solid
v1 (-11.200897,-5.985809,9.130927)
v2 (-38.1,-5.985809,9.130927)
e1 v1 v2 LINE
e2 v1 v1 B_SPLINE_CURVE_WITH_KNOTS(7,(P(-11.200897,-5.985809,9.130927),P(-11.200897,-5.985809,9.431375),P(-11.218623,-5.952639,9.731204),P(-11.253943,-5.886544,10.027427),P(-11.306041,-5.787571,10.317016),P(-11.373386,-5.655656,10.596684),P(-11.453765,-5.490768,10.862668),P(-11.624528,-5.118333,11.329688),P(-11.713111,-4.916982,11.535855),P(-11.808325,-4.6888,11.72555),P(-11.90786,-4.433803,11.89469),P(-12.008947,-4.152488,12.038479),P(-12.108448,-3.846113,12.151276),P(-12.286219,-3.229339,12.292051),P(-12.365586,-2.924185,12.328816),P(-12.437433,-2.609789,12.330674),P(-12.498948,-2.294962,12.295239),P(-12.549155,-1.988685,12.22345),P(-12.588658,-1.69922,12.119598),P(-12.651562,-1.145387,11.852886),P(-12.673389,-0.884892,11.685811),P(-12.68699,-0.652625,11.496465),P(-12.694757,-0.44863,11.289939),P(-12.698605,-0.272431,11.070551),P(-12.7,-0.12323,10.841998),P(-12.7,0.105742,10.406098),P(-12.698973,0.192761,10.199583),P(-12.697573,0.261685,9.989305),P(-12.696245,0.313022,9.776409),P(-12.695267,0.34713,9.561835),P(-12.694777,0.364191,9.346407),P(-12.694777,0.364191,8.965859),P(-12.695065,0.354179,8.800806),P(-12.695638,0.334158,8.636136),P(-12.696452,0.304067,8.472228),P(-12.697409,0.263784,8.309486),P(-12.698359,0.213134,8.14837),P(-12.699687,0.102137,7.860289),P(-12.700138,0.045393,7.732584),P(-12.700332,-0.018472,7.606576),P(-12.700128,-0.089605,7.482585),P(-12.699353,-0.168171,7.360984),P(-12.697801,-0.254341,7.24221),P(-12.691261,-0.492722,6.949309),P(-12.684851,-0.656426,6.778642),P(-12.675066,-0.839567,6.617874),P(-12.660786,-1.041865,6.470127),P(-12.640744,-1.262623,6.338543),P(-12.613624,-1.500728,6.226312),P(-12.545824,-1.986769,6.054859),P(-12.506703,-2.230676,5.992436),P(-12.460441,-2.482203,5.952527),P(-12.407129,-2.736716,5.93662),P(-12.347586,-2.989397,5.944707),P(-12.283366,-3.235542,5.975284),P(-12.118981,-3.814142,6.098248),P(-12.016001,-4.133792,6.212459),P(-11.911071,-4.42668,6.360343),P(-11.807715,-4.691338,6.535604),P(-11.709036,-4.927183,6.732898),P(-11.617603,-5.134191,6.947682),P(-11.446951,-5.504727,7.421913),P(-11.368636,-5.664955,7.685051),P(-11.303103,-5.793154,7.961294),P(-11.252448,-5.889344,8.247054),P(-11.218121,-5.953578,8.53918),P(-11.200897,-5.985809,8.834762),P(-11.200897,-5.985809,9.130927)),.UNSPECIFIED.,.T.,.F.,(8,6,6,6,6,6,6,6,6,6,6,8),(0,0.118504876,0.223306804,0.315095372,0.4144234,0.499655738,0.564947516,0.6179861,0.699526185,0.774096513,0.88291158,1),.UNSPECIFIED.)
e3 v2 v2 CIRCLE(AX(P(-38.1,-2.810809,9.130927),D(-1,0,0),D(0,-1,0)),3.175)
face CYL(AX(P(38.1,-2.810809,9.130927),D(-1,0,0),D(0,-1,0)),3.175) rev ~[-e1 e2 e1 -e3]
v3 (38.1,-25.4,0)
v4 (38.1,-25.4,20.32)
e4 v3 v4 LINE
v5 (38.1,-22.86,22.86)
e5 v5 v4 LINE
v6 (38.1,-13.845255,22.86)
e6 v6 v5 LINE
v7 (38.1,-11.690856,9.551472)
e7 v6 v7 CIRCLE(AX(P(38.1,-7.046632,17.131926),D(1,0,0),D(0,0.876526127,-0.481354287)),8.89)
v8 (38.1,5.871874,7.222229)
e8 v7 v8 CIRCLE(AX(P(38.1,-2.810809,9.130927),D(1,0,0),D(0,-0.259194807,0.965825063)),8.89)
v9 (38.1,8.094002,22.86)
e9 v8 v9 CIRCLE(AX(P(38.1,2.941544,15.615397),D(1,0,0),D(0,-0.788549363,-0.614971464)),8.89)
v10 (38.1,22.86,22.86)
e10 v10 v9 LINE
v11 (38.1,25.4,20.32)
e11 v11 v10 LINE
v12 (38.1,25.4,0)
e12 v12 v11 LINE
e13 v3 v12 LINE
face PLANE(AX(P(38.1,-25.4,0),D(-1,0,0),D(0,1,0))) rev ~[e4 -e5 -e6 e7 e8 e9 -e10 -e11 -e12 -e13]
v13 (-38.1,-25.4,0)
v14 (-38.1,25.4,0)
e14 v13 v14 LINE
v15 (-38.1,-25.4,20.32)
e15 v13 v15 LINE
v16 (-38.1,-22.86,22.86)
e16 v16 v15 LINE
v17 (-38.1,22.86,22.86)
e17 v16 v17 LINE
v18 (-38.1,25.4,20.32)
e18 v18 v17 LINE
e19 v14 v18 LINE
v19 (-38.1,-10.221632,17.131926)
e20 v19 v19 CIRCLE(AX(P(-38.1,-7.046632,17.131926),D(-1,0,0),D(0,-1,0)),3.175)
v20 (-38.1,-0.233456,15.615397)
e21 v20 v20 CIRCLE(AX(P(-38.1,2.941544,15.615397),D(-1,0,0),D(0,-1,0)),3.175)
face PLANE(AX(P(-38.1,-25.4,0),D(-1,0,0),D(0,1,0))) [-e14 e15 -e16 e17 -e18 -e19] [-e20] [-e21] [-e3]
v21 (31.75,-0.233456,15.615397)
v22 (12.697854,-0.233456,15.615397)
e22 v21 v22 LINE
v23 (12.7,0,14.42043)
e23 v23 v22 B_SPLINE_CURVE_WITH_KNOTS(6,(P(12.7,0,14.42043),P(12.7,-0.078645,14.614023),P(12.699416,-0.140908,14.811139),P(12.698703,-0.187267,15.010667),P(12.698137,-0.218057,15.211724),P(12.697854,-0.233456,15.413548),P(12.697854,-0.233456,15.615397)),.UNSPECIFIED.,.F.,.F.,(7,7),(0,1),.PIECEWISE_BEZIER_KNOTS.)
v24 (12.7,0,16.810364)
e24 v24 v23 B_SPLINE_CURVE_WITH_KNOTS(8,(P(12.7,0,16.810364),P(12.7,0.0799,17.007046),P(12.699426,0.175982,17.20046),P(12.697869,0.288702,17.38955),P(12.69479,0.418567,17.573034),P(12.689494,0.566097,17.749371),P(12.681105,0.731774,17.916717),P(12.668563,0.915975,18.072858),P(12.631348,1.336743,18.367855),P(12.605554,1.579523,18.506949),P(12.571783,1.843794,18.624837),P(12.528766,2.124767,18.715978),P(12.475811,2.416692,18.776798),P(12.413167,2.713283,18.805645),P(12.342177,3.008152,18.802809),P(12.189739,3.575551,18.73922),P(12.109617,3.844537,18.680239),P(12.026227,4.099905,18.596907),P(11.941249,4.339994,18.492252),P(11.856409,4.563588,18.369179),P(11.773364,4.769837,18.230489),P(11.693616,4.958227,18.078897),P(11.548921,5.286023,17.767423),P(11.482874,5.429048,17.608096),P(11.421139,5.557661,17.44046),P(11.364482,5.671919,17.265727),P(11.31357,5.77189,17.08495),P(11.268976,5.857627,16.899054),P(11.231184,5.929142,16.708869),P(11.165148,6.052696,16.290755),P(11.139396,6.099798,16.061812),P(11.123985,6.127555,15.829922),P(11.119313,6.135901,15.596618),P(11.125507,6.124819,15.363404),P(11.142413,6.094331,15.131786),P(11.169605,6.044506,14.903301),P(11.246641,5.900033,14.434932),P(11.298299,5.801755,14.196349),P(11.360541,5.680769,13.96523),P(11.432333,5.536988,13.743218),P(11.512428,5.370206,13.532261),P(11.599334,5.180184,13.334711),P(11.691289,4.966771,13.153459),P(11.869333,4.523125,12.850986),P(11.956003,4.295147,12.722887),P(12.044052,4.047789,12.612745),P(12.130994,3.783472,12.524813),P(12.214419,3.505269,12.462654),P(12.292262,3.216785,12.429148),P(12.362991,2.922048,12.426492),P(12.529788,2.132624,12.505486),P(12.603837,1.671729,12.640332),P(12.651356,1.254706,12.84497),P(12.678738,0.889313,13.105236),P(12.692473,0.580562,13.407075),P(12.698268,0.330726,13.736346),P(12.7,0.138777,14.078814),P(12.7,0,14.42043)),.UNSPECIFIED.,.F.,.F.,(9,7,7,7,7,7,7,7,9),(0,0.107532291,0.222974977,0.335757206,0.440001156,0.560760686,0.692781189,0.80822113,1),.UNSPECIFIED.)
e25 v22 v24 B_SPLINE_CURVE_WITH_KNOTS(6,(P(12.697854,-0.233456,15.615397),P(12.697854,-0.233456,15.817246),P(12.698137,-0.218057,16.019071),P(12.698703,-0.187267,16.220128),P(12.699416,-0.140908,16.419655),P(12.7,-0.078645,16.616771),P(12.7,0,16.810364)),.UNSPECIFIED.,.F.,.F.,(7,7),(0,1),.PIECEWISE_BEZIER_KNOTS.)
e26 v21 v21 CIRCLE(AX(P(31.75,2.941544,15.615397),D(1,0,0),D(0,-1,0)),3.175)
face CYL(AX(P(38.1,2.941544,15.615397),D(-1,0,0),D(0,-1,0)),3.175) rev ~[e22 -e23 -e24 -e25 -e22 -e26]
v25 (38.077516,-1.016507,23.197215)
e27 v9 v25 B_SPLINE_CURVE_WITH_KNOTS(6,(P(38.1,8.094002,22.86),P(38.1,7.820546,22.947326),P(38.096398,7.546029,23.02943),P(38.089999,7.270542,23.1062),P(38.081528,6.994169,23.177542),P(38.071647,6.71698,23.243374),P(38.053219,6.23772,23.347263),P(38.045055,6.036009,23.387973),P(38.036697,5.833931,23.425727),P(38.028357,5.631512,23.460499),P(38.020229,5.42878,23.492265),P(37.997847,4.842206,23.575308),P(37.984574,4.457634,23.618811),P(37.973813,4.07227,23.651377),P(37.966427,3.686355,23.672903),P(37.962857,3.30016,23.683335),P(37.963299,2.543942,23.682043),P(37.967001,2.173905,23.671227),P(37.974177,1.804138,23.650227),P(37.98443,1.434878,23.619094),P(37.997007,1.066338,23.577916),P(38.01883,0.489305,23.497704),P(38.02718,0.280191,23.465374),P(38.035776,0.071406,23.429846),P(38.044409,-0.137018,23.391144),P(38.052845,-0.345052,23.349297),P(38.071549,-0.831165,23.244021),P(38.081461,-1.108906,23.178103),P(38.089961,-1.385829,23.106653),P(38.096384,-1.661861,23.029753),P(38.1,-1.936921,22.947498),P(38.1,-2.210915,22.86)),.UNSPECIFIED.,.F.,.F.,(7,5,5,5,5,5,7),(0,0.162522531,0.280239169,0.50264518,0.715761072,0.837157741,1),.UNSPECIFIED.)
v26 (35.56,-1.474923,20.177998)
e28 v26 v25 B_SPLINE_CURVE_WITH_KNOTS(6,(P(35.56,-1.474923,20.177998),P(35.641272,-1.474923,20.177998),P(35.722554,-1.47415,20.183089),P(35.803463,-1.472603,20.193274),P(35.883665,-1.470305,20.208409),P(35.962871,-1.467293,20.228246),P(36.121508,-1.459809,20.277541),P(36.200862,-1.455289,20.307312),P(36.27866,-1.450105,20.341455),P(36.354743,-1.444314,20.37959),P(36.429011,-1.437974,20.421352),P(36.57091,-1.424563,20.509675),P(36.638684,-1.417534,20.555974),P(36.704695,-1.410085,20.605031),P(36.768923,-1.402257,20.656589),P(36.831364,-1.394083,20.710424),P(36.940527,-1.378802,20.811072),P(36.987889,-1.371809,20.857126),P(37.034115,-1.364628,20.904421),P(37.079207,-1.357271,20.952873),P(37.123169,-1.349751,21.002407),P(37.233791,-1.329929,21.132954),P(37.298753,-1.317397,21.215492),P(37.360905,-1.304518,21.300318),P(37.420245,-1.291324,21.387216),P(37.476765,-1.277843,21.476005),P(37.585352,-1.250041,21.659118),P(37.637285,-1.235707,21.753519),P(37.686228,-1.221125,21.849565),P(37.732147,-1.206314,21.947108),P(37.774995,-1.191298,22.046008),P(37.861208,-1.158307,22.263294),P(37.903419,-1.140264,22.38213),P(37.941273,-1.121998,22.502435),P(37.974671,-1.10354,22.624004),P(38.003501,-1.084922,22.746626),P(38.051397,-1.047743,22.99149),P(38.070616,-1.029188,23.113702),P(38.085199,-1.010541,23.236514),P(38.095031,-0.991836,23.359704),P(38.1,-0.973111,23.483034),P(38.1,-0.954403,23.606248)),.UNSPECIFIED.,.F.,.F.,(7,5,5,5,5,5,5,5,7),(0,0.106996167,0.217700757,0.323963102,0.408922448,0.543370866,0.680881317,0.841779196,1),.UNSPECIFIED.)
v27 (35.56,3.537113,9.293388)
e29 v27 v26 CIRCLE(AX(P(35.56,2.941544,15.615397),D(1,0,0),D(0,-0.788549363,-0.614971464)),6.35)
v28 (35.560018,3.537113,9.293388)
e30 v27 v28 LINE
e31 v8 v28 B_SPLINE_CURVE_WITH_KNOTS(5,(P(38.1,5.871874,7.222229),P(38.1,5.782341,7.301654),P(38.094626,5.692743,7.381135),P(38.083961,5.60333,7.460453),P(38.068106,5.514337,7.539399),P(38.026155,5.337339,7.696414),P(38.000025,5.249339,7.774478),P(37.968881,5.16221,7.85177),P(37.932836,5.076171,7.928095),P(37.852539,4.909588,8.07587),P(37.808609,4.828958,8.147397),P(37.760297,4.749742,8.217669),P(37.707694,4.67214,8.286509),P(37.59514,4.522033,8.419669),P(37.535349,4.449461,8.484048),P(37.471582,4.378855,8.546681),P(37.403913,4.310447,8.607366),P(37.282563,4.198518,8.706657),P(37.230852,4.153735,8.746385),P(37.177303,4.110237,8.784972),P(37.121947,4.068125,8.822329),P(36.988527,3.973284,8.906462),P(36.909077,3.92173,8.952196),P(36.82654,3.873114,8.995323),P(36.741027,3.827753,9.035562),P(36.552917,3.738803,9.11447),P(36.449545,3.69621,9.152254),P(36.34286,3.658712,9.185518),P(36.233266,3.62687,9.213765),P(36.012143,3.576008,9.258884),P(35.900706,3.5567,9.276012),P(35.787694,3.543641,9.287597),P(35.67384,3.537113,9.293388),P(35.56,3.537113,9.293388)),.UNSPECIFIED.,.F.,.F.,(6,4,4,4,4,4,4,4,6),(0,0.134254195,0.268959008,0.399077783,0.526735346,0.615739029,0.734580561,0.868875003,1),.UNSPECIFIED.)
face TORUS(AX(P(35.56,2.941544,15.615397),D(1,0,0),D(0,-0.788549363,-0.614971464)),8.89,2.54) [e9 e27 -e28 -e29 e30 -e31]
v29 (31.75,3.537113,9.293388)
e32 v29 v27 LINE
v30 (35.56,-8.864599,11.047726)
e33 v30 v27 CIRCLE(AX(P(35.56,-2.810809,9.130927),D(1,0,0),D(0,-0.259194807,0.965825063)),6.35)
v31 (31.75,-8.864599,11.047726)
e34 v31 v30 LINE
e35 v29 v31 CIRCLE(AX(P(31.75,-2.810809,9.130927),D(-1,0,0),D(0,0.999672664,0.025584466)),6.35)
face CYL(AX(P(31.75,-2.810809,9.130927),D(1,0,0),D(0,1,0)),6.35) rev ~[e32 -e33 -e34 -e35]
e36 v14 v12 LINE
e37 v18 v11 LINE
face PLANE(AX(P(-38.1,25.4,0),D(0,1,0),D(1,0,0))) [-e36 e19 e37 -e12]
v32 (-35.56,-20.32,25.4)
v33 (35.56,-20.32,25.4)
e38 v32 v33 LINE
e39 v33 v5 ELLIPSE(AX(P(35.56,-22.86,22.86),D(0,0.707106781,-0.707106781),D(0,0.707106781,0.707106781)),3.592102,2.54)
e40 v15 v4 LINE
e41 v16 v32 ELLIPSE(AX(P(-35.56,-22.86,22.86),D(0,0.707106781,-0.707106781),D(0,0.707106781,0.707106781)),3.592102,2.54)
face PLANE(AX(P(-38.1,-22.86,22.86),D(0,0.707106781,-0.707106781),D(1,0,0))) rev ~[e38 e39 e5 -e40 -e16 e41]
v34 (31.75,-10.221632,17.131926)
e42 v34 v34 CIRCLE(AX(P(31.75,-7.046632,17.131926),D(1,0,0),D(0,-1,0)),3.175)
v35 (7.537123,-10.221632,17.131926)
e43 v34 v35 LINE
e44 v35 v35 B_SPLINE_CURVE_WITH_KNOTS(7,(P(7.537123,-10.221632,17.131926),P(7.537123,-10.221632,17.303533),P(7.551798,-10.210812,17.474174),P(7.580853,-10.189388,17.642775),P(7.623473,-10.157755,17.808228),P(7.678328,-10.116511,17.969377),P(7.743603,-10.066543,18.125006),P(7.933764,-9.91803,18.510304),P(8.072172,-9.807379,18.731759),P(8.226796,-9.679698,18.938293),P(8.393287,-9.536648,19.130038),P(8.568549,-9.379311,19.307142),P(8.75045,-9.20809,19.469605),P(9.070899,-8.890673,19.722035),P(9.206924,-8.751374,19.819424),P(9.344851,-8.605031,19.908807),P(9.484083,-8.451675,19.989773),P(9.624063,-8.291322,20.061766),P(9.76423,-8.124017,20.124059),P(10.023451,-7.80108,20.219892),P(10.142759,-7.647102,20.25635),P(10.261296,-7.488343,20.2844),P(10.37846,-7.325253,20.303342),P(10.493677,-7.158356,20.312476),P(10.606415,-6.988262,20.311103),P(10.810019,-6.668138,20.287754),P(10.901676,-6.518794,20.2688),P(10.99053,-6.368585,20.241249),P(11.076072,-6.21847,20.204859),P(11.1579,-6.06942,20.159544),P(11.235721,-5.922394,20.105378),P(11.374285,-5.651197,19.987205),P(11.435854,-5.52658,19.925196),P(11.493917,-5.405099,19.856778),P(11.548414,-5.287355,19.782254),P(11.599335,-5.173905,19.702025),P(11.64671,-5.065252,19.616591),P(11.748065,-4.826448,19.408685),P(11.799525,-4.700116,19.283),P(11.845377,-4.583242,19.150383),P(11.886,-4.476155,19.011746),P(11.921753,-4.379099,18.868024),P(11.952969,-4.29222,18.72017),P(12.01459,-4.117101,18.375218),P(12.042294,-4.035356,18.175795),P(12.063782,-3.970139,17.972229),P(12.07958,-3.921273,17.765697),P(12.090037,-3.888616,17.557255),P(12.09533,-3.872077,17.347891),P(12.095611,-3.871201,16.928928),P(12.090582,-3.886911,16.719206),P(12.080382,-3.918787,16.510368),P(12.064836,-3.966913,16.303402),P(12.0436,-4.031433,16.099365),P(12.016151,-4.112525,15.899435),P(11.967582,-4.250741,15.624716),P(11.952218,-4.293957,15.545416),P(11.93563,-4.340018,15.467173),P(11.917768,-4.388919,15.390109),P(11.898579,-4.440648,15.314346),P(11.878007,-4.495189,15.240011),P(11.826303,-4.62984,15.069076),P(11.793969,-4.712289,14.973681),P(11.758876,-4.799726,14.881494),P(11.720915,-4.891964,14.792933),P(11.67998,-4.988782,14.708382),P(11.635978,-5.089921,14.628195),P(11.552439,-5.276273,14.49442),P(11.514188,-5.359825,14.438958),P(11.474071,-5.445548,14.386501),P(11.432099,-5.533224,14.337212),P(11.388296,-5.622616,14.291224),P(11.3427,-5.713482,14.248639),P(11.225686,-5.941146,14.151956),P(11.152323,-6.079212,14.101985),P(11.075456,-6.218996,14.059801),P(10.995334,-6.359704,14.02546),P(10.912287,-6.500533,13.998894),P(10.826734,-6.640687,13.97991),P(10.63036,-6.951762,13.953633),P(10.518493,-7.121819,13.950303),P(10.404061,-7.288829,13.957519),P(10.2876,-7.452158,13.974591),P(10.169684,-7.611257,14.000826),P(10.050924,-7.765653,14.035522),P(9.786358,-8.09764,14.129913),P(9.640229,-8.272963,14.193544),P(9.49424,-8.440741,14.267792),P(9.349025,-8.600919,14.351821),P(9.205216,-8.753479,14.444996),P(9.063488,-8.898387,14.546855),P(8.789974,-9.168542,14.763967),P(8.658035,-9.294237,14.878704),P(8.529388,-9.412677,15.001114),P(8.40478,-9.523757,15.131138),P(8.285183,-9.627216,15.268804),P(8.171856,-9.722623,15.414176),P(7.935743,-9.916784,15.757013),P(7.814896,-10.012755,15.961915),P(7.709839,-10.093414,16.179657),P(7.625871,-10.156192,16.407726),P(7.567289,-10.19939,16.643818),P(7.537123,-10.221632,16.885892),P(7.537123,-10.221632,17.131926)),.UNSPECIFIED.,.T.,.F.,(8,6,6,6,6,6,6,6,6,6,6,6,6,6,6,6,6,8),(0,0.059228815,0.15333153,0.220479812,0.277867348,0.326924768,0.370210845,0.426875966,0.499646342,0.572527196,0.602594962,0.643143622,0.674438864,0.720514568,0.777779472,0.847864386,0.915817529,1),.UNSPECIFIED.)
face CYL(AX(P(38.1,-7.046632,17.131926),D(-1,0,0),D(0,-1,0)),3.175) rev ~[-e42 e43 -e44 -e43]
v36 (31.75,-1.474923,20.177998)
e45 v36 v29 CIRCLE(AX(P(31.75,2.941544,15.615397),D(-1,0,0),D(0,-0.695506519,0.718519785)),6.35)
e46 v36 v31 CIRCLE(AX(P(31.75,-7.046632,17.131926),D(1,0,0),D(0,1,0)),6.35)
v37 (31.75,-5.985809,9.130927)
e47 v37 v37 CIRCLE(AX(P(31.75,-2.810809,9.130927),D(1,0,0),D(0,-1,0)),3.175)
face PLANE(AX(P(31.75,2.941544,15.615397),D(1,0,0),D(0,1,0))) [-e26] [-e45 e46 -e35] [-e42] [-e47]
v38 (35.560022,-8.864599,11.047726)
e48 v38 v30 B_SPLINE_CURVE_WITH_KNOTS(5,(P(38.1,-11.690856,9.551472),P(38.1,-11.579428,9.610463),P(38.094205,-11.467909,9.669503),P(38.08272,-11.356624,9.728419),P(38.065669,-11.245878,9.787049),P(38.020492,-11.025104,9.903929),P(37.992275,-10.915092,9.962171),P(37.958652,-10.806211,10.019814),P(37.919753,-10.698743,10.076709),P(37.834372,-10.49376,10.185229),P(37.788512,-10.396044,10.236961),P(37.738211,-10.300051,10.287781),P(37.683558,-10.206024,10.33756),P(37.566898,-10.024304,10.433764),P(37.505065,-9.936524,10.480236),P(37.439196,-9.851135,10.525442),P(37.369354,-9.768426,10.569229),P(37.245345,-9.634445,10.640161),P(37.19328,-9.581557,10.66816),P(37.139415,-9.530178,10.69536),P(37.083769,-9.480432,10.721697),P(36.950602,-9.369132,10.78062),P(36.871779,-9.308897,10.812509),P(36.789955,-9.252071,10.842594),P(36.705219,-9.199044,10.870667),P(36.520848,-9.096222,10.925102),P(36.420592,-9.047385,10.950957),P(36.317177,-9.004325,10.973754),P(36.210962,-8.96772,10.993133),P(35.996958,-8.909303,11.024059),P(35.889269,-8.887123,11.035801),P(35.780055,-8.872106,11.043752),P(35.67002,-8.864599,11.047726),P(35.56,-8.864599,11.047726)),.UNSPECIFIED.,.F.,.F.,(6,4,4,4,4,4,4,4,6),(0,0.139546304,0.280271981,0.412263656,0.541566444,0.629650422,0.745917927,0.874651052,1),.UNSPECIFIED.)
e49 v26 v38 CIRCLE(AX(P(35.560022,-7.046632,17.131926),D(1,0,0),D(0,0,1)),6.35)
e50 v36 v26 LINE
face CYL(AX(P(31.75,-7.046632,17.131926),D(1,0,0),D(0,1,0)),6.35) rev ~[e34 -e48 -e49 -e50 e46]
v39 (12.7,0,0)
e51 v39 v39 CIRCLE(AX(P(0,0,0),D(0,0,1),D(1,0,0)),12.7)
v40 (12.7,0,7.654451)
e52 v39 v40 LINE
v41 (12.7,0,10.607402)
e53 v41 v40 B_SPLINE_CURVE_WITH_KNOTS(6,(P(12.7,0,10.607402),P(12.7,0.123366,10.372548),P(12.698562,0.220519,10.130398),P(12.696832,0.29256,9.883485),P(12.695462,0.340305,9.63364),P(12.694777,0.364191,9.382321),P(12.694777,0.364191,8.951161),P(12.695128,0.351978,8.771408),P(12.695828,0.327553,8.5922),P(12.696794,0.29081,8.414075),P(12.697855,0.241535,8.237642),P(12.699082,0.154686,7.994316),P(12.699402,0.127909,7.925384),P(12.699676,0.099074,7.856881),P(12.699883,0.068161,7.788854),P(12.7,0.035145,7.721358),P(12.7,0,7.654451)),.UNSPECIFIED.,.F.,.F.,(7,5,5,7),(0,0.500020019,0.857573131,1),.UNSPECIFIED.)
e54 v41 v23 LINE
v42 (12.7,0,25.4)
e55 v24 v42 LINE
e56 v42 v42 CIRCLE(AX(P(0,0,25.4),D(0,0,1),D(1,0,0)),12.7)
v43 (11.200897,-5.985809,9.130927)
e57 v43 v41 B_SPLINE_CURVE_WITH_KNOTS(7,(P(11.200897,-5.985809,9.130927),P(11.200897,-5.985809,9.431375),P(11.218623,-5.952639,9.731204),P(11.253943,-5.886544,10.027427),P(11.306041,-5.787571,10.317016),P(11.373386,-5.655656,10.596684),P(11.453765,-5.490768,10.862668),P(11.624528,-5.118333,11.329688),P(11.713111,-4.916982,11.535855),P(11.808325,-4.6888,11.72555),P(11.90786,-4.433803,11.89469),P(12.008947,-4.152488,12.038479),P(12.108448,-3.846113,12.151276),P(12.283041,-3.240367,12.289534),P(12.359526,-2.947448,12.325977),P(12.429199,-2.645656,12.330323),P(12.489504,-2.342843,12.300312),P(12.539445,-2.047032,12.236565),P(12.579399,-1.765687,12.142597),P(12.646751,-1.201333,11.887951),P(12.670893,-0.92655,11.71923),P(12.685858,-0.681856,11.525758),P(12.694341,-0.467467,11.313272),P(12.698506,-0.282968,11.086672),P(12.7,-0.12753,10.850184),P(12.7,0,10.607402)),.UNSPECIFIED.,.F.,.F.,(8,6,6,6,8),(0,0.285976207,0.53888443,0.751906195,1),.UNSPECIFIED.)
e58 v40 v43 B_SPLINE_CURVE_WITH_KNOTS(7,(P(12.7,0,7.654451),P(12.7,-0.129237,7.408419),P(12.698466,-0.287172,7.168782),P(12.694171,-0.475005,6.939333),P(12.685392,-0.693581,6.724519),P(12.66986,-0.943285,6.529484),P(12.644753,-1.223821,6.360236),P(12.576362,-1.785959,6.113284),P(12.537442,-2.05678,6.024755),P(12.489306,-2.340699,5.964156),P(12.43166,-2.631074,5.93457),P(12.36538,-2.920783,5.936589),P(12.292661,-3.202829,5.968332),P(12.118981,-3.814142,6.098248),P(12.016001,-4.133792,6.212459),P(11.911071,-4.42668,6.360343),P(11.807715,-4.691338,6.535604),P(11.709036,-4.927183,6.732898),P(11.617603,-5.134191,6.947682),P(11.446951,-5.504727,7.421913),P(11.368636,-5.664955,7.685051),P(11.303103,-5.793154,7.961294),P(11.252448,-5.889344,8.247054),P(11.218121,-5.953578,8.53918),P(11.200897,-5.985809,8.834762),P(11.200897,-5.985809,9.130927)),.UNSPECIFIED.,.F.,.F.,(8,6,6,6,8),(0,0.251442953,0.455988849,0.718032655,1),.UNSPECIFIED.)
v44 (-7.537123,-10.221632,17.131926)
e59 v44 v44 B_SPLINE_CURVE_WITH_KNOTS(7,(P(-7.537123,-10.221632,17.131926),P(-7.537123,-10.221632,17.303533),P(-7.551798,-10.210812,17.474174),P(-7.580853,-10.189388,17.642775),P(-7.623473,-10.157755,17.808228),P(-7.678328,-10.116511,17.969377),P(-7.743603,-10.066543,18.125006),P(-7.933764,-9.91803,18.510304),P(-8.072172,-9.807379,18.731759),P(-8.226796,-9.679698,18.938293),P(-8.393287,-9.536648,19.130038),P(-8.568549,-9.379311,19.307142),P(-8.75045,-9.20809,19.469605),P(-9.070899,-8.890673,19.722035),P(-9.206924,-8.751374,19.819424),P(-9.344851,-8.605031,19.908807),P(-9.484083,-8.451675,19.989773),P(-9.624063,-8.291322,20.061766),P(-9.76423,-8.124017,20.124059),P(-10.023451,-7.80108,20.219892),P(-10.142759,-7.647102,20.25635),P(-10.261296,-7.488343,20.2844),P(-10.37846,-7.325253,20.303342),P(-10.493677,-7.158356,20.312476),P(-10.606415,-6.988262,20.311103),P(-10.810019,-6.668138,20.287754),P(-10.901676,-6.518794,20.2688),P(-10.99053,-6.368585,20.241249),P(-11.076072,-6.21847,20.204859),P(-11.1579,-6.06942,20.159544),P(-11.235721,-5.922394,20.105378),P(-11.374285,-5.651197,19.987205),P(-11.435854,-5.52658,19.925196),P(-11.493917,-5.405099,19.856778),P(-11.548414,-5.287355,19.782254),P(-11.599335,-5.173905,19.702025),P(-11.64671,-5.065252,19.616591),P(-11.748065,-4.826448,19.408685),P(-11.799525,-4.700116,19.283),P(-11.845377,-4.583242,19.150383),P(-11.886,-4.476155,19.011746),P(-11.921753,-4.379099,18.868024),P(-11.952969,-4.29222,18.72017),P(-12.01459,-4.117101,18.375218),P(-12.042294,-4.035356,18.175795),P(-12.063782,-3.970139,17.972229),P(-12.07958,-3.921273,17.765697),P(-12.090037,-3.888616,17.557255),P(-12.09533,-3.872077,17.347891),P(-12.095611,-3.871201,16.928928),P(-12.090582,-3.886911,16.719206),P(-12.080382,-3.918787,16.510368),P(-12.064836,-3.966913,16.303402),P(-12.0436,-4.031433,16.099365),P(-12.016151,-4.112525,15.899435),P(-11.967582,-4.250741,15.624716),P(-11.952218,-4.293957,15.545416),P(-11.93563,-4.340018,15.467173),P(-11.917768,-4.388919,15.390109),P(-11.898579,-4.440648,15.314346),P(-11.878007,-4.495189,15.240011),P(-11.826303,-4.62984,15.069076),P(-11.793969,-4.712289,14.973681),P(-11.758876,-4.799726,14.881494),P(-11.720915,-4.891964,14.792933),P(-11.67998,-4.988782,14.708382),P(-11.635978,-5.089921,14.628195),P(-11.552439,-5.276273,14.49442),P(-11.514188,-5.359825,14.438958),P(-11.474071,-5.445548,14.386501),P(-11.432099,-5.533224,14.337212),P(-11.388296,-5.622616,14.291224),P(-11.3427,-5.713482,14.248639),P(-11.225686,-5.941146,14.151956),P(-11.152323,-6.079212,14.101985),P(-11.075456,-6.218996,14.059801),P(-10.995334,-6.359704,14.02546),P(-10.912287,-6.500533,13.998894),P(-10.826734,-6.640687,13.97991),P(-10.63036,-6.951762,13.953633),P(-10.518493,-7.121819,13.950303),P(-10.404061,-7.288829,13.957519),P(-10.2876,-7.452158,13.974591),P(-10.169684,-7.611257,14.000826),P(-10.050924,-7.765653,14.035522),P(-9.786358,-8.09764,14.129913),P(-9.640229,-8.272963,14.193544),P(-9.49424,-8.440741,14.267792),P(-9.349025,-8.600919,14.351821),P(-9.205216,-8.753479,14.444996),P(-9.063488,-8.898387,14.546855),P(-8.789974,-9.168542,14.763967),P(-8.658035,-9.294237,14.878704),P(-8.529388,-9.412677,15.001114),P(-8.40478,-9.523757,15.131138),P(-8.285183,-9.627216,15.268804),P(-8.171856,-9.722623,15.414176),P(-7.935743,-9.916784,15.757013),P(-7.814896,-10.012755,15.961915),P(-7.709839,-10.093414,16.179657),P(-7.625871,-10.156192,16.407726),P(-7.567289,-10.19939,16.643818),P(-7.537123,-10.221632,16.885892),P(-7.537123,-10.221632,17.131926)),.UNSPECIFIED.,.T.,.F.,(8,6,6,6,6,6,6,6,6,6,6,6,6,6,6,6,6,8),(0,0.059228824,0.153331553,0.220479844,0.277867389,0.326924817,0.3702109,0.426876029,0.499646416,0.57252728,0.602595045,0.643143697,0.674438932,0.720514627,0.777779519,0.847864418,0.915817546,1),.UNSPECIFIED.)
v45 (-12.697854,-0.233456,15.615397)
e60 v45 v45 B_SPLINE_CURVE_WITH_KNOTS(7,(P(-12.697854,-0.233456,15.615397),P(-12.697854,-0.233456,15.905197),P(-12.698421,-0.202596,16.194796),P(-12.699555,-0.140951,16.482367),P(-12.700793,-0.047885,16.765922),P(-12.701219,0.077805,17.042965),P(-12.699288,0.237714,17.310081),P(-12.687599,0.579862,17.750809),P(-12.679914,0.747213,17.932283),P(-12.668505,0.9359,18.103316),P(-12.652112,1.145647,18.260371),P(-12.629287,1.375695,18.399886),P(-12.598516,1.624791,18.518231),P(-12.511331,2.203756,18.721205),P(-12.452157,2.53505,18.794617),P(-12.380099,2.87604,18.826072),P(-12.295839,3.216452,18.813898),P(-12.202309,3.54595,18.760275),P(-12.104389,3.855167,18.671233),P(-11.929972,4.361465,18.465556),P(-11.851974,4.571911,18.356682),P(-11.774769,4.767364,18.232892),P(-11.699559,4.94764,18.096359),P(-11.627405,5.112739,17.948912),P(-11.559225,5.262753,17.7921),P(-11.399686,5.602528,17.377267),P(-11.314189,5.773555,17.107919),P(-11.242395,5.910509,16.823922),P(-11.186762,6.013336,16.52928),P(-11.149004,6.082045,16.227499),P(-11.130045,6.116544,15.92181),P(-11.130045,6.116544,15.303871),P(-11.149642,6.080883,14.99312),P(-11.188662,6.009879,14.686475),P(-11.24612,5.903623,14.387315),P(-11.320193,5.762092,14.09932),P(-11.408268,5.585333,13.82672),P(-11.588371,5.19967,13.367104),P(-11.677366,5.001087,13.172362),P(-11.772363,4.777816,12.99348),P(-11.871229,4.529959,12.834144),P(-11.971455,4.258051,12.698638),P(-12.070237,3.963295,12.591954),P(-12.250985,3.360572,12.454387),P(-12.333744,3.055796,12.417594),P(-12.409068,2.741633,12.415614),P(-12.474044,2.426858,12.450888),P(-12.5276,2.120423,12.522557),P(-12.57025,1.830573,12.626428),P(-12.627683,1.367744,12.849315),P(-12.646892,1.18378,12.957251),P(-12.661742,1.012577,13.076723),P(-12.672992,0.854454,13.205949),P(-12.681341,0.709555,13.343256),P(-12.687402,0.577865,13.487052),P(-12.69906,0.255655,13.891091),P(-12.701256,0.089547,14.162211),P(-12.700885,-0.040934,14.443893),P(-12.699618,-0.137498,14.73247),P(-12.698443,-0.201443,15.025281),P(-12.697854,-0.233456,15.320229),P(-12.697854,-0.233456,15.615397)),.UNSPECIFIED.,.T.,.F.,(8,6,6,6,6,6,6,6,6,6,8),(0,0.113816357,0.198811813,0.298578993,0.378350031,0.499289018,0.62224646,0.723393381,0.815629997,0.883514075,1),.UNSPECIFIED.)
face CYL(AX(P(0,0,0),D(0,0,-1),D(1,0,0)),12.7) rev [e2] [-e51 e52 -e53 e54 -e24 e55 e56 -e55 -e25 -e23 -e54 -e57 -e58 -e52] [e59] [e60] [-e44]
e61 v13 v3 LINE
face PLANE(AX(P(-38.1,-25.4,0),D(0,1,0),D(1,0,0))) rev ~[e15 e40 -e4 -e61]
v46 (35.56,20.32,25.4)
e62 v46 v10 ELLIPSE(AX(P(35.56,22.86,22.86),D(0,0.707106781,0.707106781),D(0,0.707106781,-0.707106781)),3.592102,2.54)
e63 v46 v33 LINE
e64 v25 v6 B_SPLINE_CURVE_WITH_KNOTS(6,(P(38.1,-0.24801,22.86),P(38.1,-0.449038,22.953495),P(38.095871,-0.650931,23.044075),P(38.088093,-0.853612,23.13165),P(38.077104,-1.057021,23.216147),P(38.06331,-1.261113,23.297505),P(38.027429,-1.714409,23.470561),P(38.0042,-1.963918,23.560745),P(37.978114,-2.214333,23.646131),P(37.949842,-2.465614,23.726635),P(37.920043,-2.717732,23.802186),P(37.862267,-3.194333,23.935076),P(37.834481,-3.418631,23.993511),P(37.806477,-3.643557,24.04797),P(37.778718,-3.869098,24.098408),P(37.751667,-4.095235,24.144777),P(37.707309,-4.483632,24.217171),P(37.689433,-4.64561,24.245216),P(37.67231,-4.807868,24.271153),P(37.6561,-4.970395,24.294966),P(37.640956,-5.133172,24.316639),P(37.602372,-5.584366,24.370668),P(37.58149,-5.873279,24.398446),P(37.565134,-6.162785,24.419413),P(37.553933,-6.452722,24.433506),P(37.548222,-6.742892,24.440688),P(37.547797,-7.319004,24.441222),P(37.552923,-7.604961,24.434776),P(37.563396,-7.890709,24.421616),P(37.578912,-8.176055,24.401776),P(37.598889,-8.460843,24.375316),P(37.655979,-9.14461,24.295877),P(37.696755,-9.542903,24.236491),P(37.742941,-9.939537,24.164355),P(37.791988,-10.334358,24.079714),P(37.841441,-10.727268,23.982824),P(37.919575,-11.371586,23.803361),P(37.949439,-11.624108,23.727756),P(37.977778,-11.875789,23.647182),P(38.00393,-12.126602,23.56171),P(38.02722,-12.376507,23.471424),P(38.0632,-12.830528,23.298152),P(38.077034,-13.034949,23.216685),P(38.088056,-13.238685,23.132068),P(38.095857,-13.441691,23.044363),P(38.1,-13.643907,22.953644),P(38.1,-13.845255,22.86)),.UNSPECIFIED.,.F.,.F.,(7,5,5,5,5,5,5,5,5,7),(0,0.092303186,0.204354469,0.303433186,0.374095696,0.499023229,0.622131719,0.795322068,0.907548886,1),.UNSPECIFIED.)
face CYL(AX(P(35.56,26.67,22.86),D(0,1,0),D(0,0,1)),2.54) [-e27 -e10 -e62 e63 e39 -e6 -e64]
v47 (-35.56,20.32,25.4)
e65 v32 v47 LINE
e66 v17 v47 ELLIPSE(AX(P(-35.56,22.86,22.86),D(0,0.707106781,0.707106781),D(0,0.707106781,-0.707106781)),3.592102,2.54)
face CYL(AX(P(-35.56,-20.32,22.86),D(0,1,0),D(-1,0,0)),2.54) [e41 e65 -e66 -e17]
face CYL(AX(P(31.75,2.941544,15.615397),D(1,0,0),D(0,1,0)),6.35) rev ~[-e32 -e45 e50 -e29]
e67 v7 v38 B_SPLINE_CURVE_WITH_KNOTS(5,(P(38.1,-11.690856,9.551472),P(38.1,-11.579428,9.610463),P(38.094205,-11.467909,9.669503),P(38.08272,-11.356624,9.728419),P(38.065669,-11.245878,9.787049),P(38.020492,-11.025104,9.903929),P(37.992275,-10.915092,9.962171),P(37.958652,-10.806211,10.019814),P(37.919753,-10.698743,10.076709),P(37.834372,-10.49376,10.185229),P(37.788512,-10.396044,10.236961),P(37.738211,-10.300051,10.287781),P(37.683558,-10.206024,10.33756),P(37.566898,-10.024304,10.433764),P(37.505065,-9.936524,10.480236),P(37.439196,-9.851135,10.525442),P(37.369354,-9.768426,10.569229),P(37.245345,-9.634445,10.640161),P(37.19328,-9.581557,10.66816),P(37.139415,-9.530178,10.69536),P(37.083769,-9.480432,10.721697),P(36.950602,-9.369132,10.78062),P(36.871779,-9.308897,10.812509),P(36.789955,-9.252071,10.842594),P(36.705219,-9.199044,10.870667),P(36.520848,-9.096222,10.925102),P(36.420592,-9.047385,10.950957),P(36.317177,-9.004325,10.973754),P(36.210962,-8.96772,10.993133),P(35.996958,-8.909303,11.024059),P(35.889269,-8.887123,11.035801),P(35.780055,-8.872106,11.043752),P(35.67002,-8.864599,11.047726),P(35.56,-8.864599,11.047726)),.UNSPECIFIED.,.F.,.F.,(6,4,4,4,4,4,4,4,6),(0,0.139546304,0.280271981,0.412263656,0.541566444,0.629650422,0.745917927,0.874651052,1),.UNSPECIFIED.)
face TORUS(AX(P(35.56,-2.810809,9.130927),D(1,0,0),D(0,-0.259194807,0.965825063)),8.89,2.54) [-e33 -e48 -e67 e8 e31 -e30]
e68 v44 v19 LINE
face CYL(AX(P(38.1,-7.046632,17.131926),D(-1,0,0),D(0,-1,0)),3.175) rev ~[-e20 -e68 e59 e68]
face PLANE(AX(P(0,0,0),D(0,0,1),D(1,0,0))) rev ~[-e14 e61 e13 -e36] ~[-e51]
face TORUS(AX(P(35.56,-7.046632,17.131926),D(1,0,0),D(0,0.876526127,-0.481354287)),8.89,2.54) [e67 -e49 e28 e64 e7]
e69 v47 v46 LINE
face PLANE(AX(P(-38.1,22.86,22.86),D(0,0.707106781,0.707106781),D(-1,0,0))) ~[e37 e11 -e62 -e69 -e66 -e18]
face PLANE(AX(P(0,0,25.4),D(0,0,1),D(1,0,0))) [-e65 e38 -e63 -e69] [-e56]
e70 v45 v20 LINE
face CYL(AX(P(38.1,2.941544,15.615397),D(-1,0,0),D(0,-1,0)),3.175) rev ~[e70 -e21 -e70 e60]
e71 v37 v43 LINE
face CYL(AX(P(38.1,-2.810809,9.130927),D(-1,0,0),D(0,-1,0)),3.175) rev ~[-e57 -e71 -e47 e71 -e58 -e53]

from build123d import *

# Parameters (mm, degrees)
F0_W           = 76.2
F0_H           = 50.8
F0_R           = 12.7
F1_DEPTH       = 25.4
F3_D           = 6.35
F3_CBORE_D     = 12.7
F3_CBORE_DEPTH = 6.35
F4_SIZE        = 5.08
F5_R           = 2.54
F6_T1_DEPTH    = 53.34
F6_T4_ANGLE    = 333.5496050311
F6_T6_ANGLE    = 313.8522207809
F6_T8_ANGLE    = 339.5771348814


# Not quite as in the source:
# - a fillet or chamfer that OpenCascade refuses, or shapes differently, is made with other operations: its cross-section is extruded or revolved along the edge and cut away or added


with BuildPart() as f1:
    # F0 (on Top) → F1 (new body)
    with BuildSketch(Plane.XY):
        Rectangle(F0_W, F0_H)
        Circle(F0_R, mode=Mode.SUBTRACT)
    extrude(amount=F1_DEPTH)

    # F3 (through all)
    with Locations(Plane.YZ.offset(38.1)):
        with Locations((-7.0466324687, 17.1319264919), (2.941543702, 15.6153971329), (-2.8108085971, 9.1309268028)):
            CounterBoreHole(F3_D / 2, F3_CBORE_D / 2, F3_CBORE_DEPTH)

    # F4
    f4_edges = [f1.edges().sort_by_distance(p)[0] for p in [
        (0, -25.4, 25.4),
        (0, 25.4, 25.4),
    ]]
    chamfer(f4_edges, length=F4_SIZE)

    # F5
    f5_edges = [f1.edges().sort_by_distance(p)[0] for p in [
        (-38.1, 0, 25.4),
    ]]
    fillet(f5_edges, radius=F5_R)

    # F6: fillet of radius 2.54 on 4 edges, made by hand

    # F6_s2 → F6_t1 (cut)
    with BuildSketch(Plane.XZ.offset(-26.67)):
        with BuildLine():
            ThreePointArc((35.56, 25.4), (37.3560512242, 24.6560512242), (38.1, 22.86))
            Line((38.1, 22.86), (38.1, 25.4))
            Line((38.1, 25.4), (35.56, 25.4))
        make_face()
    extrude(amount=F6_T1_DEPTH, mode=Mode.SUBTRACT)

    # F6_s3 → F6_t4 (revolve, cut)
    with BuildSketch(Plane(origin=(0, -6.4599960512, 8.2833530872), x_dir=(1, 0, 0), z_dir=(0, -0.6149714639, 0.7885493634))):
        with BuildLine():
            ThreePointArc((38.1, 3.032576048), (37.3560512242, 4.8286272723), (35.56, 5.572576048))
            Line((35.56, 5.572576048), (38.1, 5.572576048))
            Line((38.1, 5.572576048), (38.1, 3.032576048))
        make_face()
    revolve(axis=Axis((38.1, 2.941543702, 15.6153971329), (1, 0, 0)), revolution_arc=F6_T4_ANGLE, mode=Mode.SUBTRACT)

    # F6_s5 → F6_t6 (revolve, cut)
    with BuildSketch(Plane(origin=(0, -0.3361656341, -0.0902154954), x_dir=(1, 0, 0), z_dir=(0, 0.9658250629, 0.2591948067))):
        with BuildLine():
            ThreePointArc((38.1, -18.4374249449), (37.3560512242, -16.6413737207), (35.56, -15.8974249449))
            Line((35.56, -15.8974249449), (38.1, -15.8974249449))
            Line((38.1, -15.8974249449), (38.1, -18.4374249449))
        make_face()
    revolve(axis=Axis((38.1, -2.8108085971, 9.1309268028), (1, 0, 0)), revolution_arc=F6_T6_ANGLE, mode=Mode.SUBTRACT)

    # F6_s7 → F6_t8 (revolve, cut)
    with BuildSketch(Plane(origin=(0, 5.5955772378, 10.1893133195), x_dir=(1, 0, 0), z_dir=(0, -0.4813542865, -0.8765261267))):
        with BuildLine():
            ThreePointArc((38.1, 5.5330837175), (37.3560512242, 7.3291349418), (35.56, 8.0730837175))
            Line((35.56, 8.0730837175), (38.1, 8.0730837175))
            Line((38.1, 8.0730837175), (38.1, 5.5330837175))
        make_face()
    revolve(axis=Axis((38.1, -7.0466324687, 17.1319264919), (1, 0, 0)), revolution_arc=F6_T8_ANGLE, mode=Mode.SUBTRACT)


solid = f1.part
